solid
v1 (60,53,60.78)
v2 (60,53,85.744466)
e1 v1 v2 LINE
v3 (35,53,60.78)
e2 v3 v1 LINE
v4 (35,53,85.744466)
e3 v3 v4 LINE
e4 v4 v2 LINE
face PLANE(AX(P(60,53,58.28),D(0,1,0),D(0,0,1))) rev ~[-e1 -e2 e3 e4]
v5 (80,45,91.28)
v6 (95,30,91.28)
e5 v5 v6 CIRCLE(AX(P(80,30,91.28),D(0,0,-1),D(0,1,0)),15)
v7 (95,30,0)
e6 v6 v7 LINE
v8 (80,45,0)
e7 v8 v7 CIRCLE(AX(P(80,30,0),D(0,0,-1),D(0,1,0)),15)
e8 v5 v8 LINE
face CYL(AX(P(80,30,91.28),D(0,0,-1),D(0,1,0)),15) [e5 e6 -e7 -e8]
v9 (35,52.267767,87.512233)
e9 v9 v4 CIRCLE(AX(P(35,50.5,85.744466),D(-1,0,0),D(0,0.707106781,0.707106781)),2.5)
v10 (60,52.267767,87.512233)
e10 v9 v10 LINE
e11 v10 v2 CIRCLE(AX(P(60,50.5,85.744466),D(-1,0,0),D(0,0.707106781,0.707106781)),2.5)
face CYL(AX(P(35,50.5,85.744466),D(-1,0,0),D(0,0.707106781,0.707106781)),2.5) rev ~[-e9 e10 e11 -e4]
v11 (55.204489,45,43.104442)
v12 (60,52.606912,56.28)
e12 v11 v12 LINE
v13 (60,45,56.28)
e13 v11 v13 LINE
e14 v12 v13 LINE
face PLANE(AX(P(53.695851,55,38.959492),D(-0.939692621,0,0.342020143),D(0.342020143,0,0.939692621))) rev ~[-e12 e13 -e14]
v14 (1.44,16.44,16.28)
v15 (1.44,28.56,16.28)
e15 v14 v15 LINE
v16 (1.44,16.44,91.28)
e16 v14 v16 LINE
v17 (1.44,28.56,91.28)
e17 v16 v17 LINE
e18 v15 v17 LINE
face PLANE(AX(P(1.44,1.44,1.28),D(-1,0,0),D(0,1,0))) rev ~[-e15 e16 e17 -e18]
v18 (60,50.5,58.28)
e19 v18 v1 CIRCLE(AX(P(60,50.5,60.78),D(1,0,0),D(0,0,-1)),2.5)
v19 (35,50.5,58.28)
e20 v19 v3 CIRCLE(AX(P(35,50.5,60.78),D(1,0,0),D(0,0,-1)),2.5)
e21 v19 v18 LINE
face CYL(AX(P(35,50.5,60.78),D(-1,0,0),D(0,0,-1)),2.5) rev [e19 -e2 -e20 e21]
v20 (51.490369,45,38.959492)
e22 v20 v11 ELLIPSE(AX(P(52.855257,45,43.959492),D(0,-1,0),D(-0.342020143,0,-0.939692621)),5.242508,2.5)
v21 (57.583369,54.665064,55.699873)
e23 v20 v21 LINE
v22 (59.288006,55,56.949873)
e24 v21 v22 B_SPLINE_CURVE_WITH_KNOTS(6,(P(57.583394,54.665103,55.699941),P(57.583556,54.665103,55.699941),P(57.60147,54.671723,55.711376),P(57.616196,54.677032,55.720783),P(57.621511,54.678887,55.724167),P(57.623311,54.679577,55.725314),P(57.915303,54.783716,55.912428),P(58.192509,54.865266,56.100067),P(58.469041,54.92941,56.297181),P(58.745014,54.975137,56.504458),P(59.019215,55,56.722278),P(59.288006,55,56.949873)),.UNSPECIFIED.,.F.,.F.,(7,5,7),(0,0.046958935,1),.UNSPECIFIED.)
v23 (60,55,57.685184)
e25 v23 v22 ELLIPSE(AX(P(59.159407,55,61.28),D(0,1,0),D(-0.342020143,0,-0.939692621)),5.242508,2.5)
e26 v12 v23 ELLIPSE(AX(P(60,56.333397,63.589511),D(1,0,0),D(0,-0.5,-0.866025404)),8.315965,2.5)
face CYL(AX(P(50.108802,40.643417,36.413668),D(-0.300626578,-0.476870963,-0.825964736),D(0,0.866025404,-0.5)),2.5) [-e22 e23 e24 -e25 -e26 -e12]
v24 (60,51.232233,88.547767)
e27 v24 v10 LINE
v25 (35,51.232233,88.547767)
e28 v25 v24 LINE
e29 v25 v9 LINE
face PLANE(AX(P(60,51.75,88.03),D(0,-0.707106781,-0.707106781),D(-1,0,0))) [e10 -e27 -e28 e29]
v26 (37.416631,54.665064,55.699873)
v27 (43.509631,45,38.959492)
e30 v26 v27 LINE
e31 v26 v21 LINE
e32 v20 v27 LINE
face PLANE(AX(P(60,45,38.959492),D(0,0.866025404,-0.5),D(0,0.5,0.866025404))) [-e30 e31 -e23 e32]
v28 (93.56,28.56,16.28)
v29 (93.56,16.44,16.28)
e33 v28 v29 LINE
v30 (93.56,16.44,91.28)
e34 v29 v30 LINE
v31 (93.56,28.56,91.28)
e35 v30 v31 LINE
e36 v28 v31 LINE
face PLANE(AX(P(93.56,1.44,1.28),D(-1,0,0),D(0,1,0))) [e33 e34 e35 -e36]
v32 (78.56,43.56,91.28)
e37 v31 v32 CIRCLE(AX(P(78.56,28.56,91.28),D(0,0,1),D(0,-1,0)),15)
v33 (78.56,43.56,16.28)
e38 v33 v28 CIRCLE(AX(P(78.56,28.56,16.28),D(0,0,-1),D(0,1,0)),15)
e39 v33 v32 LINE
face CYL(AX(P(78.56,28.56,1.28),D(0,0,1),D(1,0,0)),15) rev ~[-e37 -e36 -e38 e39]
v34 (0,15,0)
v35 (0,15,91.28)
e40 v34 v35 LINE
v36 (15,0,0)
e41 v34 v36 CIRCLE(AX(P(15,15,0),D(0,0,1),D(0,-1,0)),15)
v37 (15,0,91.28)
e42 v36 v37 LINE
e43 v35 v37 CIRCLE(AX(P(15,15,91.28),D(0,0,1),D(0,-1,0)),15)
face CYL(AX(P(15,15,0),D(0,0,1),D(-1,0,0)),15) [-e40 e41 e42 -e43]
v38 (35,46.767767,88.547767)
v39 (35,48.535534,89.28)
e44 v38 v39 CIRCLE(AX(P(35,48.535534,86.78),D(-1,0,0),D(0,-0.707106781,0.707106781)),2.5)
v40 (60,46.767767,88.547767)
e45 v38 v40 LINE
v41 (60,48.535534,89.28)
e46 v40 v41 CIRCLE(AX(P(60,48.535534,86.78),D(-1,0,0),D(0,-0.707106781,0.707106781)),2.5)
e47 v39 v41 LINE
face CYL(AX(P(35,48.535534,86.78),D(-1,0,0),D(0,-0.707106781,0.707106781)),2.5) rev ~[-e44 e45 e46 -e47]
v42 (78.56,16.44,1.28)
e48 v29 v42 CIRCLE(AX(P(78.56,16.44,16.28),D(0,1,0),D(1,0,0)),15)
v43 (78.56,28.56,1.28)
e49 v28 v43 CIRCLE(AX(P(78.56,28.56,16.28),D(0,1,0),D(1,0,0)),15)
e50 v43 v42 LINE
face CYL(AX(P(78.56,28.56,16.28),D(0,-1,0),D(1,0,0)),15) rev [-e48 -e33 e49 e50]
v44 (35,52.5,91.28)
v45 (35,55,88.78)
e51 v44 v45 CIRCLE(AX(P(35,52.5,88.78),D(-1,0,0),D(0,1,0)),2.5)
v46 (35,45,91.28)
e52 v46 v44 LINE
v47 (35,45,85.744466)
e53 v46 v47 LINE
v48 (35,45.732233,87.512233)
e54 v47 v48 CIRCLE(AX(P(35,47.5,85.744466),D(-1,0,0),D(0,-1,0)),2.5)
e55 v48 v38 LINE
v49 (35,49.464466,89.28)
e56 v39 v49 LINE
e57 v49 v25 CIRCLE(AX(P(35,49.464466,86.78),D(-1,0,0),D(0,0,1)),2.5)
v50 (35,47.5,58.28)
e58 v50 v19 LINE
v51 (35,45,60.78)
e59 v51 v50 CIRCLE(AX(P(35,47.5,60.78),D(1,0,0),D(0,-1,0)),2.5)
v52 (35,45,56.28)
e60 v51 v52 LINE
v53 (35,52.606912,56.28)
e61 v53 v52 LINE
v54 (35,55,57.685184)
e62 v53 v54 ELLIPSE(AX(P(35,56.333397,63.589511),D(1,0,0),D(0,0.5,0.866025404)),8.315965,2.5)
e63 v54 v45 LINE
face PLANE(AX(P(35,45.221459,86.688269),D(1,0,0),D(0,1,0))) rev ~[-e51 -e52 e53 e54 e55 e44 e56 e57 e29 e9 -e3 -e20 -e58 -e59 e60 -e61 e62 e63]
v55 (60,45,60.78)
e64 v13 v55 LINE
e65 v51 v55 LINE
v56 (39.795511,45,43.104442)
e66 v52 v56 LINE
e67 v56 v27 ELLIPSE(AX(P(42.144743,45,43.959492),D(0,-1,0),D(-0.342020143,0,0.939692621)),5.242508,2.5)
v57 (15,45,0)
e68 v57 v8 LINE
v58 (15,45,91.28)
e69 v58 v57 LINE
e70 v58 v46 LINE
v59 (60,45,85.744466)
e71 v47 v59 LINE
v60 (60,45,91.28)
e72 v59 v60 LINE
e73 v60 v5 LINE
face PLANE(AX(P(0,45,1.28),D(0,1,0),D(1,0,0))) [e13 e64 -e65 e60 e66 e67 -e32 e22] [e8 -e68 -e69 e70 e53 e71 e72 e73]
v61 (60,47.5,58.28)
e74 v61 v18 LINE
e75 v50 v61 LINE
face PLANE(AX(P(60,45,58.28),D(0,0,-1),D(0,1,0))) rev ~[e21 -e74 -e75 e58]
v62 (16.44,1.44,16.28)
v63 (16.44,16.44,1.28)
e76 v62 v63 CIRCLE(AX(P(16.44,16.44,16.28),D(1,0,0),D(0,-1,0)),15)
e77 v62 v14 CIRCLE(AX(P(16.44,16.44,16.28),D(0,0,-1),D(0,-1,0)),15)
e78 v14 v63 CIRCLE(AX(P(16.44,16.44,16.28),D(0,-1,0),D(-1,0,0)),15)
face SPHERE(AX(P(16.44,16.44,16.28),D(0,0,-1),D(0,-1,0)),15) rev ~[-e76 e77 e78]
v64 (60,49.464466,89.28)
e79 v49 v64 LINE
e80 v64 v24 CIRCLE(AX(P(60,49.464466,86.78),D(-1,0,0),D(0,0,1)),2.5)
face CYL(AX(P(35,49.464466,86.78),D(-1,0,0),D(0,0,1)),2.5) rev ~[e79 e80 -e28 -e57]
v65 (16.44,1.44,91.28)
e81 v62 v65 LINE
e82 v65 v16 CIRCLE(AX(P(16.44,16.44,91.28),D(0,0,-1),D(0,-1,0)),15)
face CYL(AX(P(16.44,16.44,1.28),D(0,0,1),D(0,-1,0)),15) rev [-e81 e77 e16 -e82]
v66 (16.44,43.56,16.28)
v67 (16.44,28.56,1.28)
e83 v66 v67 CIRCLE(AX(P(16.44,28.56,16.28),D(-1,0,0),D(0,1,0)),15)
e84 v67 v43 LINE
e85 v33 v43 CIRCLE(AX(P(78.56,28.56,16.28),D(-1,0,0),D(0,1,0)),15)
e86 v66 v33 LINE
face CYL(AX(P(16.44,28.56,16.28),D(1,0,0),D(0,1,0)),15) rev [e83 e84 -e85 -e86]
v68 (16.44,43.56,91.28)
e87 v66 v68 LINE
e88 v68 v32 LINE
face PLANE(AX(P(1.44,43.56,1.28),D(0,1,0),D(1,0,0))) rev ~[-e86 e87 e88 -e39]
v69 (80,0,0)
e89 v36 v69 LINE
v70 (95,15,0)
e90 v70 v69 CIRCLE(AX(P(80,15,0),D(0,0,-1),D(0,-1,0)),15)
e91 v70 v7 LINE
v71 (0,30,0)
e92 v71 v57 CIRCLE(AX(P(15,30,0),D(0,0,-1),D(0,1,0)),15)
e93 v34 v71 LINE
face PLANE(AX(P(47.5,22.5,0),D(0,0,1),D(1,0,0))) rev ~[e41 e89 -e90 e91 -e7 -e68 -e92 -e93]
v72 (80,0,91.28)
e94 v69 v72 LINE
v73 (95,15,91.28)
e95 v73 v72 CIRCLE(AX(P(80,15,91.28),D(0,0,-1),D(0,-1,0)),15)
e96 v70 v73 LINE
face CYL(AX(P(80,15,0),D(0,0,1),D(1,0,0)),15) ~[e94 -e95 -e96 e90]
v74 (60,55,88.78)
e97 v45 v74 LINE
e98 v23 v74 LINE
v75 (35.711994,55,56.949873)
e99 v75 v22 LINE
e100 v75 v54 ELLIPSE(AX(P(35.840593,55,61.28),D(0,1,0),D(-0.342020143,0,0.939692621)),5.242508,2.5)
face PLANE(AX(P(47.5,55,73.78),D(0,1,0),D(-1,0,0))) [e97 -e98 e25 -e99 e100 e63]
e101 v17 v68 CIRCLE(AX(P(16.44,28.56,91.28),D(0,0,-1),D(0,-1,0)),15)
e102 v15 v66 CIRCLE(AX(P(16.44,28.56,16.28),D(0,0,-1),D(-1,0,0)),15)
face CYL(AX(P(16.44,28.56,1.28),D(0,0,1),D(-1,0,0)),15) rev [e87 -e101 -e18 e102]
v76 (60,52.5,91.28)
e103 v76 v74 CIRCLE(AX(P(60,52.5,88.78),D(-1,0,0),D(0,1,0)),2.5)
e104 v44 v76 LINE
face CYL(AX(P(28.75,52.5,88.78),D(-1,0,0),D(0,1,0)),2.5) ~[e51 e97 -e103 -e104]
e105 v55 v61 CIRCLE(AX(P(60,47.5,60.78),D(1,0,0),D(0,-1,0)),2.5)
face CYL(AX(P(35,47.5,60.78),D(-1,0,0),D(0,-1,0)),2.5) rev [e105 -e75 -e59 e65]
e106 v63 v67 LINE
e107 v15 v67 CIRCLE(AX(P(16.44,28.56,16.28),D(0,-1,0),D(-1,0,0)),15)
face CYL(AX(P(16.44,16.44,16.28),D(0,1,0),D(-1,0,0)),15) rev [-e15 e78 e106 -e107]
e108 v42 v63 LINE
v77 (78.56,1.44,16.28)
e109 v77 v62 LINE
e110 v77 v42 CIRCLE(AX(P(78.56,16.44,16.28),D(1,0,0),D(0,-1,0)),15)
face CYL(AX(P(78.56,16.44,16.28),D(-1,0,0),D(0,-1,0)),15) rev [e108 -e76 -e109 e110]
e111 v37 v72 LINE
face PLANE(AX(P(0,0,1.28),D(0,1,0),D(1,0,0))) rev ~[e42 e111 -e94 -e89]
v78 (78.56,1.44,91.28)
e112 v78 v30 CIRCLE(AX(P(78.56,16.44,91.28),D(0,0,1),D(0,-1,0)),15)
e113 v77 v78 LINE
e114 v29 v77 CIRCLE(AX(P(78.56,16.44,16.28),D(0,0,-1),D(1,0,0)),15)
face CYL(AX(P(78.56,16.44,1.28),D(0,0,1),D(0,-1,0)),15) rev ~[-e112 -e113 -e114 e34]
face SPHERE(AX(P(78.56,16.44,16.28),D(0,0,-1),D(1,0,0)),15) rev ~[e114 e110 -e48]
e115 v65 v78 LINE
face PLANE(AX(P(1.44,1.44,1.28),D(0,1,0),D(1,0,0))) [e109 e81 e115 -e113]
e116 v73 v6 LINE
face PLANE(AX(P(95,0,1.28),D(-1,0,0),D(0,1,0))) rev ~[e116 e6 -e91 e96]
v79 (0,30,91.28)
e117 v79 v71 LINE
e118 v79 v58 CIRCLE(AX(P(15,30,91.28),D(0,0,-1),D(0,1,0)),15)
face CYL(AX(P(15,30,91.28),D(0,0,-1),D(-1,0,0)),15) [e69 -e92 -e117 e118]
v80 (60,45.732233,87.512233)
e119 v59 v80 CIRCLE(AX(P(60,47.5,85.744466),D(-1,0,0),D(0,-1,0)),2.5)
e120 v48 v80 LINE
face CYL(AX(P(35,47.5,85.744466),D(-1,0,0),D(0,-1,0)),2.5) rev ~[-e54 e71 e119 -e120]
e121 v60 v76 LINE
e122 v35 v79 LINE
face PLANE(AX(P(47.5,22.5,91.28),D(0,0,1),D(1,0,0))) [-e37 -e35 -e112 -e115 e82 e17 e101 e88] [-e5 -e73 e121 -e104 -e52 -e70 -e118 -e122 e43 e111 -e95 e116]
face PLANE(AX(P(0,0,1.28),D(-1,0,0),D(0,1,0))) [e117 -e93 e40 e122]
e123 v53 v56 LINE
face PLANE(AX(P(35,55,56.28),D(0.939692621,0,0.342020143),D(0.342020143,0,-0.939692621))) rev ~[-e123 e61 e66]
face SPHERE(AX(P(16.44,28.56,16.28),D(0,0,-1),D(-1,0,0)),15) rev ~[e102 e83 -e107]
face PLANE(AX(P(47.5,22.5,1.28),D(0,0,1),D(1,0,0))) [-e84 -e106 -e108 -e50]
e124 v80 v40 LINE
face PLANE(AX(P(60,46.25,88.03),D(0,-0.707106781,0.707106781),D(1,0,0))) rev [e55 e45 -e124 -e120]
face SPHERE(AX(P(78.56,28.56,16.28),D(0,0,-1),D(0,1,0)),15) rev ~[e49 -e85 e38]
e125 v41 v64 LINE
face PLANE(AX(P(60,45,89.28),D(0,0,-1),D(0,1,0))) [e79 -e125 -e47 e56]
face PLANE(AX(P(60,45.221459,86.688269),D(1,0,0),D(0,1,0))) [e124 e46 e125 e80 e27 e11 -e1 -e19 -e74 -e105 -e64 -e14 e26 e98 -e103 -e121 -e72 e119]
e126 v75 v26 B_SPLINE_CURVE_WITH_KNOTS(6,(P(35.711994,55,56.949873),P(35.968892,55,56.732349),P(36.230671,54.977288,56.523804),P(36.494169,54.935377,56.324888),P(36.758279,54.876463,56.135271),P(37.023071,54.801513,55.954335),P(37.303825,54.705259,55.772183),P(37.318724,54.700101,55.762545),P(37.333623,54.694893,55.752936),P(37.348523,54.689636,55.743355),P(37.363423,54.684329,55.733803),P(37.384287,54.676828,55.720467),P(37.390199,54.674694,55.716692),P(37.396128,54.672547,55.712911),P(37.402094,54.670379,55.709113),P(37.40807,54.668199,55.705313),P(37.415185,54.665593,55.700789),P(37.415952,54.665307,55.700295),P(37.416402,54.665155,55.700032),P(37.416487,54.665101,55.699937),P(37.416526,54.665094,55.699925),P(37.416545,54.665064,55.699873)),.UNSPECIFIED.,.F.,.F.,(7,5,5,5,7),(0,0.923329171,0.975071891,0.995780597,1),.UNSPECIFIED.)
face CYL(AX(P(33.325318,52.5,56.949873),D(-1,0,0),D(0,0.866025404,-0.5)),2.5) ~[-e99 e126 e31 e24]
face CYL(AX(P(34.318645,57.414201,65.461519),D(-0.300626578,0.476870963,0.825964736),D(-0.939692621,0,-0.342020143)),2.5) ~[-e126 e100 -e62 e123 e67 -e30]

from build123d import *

# Parameters (mm, degrees)
F0_W          = 95
F0_H          = 45
F1_DEPTH      = 1.28
F2_W          = 95
F2_H          = 45
F2_W_2        = 92.12
F2_H_2        = 42.12
F3_DEPTH      = 90
F4_W          = 25
F4_H          = 35
F5_DEPTH      = 10
F6_W          = 8
F6_H          = 31
F7_DEPTH      = 60.001
F9_DEPTH      = 25
F11_DEPTH     = 10
F12_SIZE      = 2.5
F13_T1_DEPTH  = 25
F13_T3_DEPTH  = 37.5
F13_T5_DEPTH  = 28.3493649054
F13_T10_DEPTH = 35.1683904211
F13_T15_DEPTH = 35.1683904211
F14_R         = 15
F15_R         = 15
F16_R         = 15


# Not quite as in the source:
# - a fillet or chamfer that OpenCascade refuses, or shapes differently, is made with other operations: its cross-section is extruded or revolved along the edge and cut away or added


with BuildPart() as f1:
    # F0 (on Top) → F1 (new body)
    with BuildSketch(Plane.XY):
        with Locations((47.5, 22.5)):
            Rectangle(F0_W, F0_H)
    extrude(amount=F1_DEPTH)

    # F2 (on face) → F3 (join)
    with BuildSketch(Plane.XY.offset(1.28)):
        with Locations((47.5, 22.5)):
            Rectangle(F2_W, F2_H)
        with Locations((47.5, 22.5)):
            Rectangle(F2_W_2, F2_H_2, mode=Mode.SUBTRACT)
    extrude(amount=F3_DEPTH)

    # F4 (on face) → F5 (join)
    with BuildSketch(Plane(origin=(0, 45, 0), x_dir=(-1, 0, 0), z_dir=(0, 1, 0))):
        with Locations((-47.5, 73.78)):
            Rectangle(F4_W, F4_H)
    extrude(amount=F5_DEPTH)

    # F6 (on face) → F7 (cut, through all)
    with BuildSketch(Plane.YZ.offset(60)):
        with Locations((49, 73.78)):
            Rectangle(F6_W, F6_H)
    extrude(amount=-F7_DEPTH, mode=Mode.SUBTRACT)

    # F8 (on face) → F9 (join, through all)
    with BuildSketch(Plane.YZ.offset(60)):
        Polygon((55, 56.28), (45, 56.28), (45, 38.9594919243), align=None)
    extrude(amount=-F9_DEPTH)

    # F10 (on face) → F11 (cut, through all)
    with BuildSketch(Plane(origin=(0, 55, 0), x_dir=(-1, 0, 0), z_dir=(0, 1, 0))):
        Polygon((-53.6958506181, 38.9594919243), (-60, 56.28), (-60, 38.9594919243), align=None)
        Polygon((-41.304149382, 38.9594919243), (-35, 38.9594919243), (-35, 56.28), align=None)
    extrude(amount=-F11_DEPTH, mode=Mode.SUBTRACT)

    # F12
    f12_edges = [f1.edges().sort_by_distance(p)[0] for p in [
        (47.5, 45, 89.28),
        (47.5, 53, 89.28),
    ]]
    chamfer(f12_edges, length=F12_SIZE)

    # F13: fillet of radius 2.5 on 10 edges, made by hand

    # F13_s2 → F13_t1 (join)
    with BuildSketch(Plane.YZ.offset(35)):
        with BuildLine():
            ThreePointArc((45, 85.7444660941), (45.1903011687, 86.701174675), (45.732233047, 87.512233047))
            Line((45.732233047, 87.512233047), (45, 86.78))
            Line((45, 86.78), (45, 85.7444660941))
        make_face()
        with BuildLine():
            ThreePointArc((52.267766953, 87.512233047), (52.8096988313, 86.701174675), (53, 85.7444660941))
            Line((53, 85.7444660941), (53, 86.78))
            Line((53, 86.78), (52.267766953, 87.512233047))
        make_face()
        with BuildLine():
            ThreePointArc((50.5, 58.28), (52.267766953, 59.012233047), (53, 60.78))
            Line((53, 60.78), (53, 58.28))
            Line((53, 58.28), (50.5, 58.28))
        make_face()
        with BuildLine():
            ThreePointArc((45, 60.78), (45.732233047, 59.012233047), (47.5, 58.28))
            Line((47.5, 58.28), (45, 58.28))
            Line((45, 58.28), (45, 60.78))
        make_face()
        with BuildLine():
            ThreePointArc((46.767766953, 88.547766953), (47.578825325, 89.0896988313), (48.5355339059, 89.28))
            Line((48.5355339059, 89.28), (47.5, 89.28))
            Line((47.5, 89.28), (46.767766953, 88.547766953))
        make_face()
        with BuildLine():
            ThreePointArc((49.4644660941, 89.28), (50.421174675, 89.0896988313), (51.232233047, 88.547766953))
            Line((51.232233047, 88.547766953), (50.5, 89.28))
            Line((50.5, 89.28), (49.4644660941, 89.28))
        make_face()
    extrude(amount=F13_T1_DEPTH)

    # F13_s4 → F13_t3 (cut)
    with BuildSketch(Plane.YZ.offset(28.75)):
        with BuildLine():
            ThreePointArc((55, 88.78), (54.267766953, 90.547766953), (52.5, 91.28))
            Line((52.5, 91.28), (55, 91.28))
            Line((55, 91.28), (55, 88.78))
        make_face()
    extrude(amount=F13_T3_DEPTH, mode=Mode.SUBTRACT)

    # F13_s6 → F13_t5 (cut)
    with BuildSketch(Plane.YZ.offset(33.3253175473)):
        with BuildLine():
            ThreePointArc((54.6650635095, 55.6998729811), (54.9148145657, 56.3028253683), (55, 56.9498729811))
            Line((55, 56.9498729811), (55, 56.28))
            Line((55, 56.28), (54.6650635095, 55.6998729811))
        make_face()
    extrude(amount=F13_T5_DEPTH, mode=Mode.SUBTRACT)


with BuildPart() as f13_tool8:
    # F13_s9 → F13_t10 (new body)
    with BuildSketch(Plane(origin=(19.397060828, 30.7687201759, 53.2929866286), x_dir=(-0.8459331757, 0.5332889107, 0), z_dir=(0.3006265785, 0.4768709627, 0.8259647361))):
        with BuildLine():
            ThreePointArc((-19.5594103687, -32.1600455029), (-21.2581254439, -32.3827100323), (-22.7013076364, -31.4594345813))
            Line((-22.7013076364, -31.4594345813), (-21.425100455, -33.1315112786))
            Line((-21.425100455, -33.1315112786), (-19.5594103687, -32.1600455029))
        make_face()
    extrude(amount=F13_T10_DEPTH)

    split(bisect_by=Plane.XZ.offset(-45), keep=Keep.BOTTOM)


with BuildPart() as f1_1:
    add(f1.part)

    # F13_t7: cut F13_tool8
    add(f13_tool8.part, mode=Mode.SUBTRACT)


with BuildPart() as f13_tool13:
    # F13_s14 → F13_t15 (new body)
    with BuildSketch(Plane(origin=(-21.3838614404, 33.9202962128, 58.7516764483), x_dir=(0.8459331757, 0.5332889107, 0), z_dir=(0.3006265785, -0.4768709627, -0.8259647361))):
        with BuildLine():
            ThreePointArc((57.6623440552, 10.3859596823), (59.1055262478, 9.4626842314), (60.8042413229, 9.6853487608))
            Line((60.8042413229, 9.6853487608), (58.9385512366, 8.713882985))
            Line((58.9385512366, 8.713882985), (57.6623440552, 10.3859596823))
        make_face()
    extrude(amount=F13_T15_DEPTH)

    split(bisect_by=Plane.XZ.offset(-45), keep=Keep.BOTTOM)


with BuildPart() as f1_2:
    add(f1_1.part)

    # F13_t12: cut F13_tool13
    add(f13_tool13.part, mode=Mode.SUBTRACT)

    # F14
    f14_edges = [f1_2.edges().sort_by_distance(p)[0] for p in [
        (1.44, 43.56, 46.28),
        (1.44, 1.44, 46.28),
        (93.56, 43.56, 46.28),
        (93.56, 1.44, 46.28),
    ]]
    fillet(f14_edges, radius=F14_R)

    # F15
    f15_edges = [f1_2.edges().sort_by_distance(p)[0] for p in [
        (95, 0, 45.64),
        (95, 45, 45.64),
        (0, 45, 45.64),
        (0, 0, 45.64),
    ]]
    fillet(f15_edges, radius=F15_R)

    # F16
    f16_edges = [f1_2.edges().sort_by_distance(p)[0] for p in [
        (47.5, 43.56, 1.28),
        (5.833398, 39.166602, 1.28),
        (89.166602, 39.166602, 1.28),
        (1.44, 22.5, 1.28),
        (93.56, 22.5, 1.28),
        (5.833398, 5.833398, 1.28),
        (89.166602, 5.833398, 1.28),
        (47.5, 1.44, 1.28),
    ]]
    fillet(f16_edges, radius=F16_R)


solid = f1_2.part
